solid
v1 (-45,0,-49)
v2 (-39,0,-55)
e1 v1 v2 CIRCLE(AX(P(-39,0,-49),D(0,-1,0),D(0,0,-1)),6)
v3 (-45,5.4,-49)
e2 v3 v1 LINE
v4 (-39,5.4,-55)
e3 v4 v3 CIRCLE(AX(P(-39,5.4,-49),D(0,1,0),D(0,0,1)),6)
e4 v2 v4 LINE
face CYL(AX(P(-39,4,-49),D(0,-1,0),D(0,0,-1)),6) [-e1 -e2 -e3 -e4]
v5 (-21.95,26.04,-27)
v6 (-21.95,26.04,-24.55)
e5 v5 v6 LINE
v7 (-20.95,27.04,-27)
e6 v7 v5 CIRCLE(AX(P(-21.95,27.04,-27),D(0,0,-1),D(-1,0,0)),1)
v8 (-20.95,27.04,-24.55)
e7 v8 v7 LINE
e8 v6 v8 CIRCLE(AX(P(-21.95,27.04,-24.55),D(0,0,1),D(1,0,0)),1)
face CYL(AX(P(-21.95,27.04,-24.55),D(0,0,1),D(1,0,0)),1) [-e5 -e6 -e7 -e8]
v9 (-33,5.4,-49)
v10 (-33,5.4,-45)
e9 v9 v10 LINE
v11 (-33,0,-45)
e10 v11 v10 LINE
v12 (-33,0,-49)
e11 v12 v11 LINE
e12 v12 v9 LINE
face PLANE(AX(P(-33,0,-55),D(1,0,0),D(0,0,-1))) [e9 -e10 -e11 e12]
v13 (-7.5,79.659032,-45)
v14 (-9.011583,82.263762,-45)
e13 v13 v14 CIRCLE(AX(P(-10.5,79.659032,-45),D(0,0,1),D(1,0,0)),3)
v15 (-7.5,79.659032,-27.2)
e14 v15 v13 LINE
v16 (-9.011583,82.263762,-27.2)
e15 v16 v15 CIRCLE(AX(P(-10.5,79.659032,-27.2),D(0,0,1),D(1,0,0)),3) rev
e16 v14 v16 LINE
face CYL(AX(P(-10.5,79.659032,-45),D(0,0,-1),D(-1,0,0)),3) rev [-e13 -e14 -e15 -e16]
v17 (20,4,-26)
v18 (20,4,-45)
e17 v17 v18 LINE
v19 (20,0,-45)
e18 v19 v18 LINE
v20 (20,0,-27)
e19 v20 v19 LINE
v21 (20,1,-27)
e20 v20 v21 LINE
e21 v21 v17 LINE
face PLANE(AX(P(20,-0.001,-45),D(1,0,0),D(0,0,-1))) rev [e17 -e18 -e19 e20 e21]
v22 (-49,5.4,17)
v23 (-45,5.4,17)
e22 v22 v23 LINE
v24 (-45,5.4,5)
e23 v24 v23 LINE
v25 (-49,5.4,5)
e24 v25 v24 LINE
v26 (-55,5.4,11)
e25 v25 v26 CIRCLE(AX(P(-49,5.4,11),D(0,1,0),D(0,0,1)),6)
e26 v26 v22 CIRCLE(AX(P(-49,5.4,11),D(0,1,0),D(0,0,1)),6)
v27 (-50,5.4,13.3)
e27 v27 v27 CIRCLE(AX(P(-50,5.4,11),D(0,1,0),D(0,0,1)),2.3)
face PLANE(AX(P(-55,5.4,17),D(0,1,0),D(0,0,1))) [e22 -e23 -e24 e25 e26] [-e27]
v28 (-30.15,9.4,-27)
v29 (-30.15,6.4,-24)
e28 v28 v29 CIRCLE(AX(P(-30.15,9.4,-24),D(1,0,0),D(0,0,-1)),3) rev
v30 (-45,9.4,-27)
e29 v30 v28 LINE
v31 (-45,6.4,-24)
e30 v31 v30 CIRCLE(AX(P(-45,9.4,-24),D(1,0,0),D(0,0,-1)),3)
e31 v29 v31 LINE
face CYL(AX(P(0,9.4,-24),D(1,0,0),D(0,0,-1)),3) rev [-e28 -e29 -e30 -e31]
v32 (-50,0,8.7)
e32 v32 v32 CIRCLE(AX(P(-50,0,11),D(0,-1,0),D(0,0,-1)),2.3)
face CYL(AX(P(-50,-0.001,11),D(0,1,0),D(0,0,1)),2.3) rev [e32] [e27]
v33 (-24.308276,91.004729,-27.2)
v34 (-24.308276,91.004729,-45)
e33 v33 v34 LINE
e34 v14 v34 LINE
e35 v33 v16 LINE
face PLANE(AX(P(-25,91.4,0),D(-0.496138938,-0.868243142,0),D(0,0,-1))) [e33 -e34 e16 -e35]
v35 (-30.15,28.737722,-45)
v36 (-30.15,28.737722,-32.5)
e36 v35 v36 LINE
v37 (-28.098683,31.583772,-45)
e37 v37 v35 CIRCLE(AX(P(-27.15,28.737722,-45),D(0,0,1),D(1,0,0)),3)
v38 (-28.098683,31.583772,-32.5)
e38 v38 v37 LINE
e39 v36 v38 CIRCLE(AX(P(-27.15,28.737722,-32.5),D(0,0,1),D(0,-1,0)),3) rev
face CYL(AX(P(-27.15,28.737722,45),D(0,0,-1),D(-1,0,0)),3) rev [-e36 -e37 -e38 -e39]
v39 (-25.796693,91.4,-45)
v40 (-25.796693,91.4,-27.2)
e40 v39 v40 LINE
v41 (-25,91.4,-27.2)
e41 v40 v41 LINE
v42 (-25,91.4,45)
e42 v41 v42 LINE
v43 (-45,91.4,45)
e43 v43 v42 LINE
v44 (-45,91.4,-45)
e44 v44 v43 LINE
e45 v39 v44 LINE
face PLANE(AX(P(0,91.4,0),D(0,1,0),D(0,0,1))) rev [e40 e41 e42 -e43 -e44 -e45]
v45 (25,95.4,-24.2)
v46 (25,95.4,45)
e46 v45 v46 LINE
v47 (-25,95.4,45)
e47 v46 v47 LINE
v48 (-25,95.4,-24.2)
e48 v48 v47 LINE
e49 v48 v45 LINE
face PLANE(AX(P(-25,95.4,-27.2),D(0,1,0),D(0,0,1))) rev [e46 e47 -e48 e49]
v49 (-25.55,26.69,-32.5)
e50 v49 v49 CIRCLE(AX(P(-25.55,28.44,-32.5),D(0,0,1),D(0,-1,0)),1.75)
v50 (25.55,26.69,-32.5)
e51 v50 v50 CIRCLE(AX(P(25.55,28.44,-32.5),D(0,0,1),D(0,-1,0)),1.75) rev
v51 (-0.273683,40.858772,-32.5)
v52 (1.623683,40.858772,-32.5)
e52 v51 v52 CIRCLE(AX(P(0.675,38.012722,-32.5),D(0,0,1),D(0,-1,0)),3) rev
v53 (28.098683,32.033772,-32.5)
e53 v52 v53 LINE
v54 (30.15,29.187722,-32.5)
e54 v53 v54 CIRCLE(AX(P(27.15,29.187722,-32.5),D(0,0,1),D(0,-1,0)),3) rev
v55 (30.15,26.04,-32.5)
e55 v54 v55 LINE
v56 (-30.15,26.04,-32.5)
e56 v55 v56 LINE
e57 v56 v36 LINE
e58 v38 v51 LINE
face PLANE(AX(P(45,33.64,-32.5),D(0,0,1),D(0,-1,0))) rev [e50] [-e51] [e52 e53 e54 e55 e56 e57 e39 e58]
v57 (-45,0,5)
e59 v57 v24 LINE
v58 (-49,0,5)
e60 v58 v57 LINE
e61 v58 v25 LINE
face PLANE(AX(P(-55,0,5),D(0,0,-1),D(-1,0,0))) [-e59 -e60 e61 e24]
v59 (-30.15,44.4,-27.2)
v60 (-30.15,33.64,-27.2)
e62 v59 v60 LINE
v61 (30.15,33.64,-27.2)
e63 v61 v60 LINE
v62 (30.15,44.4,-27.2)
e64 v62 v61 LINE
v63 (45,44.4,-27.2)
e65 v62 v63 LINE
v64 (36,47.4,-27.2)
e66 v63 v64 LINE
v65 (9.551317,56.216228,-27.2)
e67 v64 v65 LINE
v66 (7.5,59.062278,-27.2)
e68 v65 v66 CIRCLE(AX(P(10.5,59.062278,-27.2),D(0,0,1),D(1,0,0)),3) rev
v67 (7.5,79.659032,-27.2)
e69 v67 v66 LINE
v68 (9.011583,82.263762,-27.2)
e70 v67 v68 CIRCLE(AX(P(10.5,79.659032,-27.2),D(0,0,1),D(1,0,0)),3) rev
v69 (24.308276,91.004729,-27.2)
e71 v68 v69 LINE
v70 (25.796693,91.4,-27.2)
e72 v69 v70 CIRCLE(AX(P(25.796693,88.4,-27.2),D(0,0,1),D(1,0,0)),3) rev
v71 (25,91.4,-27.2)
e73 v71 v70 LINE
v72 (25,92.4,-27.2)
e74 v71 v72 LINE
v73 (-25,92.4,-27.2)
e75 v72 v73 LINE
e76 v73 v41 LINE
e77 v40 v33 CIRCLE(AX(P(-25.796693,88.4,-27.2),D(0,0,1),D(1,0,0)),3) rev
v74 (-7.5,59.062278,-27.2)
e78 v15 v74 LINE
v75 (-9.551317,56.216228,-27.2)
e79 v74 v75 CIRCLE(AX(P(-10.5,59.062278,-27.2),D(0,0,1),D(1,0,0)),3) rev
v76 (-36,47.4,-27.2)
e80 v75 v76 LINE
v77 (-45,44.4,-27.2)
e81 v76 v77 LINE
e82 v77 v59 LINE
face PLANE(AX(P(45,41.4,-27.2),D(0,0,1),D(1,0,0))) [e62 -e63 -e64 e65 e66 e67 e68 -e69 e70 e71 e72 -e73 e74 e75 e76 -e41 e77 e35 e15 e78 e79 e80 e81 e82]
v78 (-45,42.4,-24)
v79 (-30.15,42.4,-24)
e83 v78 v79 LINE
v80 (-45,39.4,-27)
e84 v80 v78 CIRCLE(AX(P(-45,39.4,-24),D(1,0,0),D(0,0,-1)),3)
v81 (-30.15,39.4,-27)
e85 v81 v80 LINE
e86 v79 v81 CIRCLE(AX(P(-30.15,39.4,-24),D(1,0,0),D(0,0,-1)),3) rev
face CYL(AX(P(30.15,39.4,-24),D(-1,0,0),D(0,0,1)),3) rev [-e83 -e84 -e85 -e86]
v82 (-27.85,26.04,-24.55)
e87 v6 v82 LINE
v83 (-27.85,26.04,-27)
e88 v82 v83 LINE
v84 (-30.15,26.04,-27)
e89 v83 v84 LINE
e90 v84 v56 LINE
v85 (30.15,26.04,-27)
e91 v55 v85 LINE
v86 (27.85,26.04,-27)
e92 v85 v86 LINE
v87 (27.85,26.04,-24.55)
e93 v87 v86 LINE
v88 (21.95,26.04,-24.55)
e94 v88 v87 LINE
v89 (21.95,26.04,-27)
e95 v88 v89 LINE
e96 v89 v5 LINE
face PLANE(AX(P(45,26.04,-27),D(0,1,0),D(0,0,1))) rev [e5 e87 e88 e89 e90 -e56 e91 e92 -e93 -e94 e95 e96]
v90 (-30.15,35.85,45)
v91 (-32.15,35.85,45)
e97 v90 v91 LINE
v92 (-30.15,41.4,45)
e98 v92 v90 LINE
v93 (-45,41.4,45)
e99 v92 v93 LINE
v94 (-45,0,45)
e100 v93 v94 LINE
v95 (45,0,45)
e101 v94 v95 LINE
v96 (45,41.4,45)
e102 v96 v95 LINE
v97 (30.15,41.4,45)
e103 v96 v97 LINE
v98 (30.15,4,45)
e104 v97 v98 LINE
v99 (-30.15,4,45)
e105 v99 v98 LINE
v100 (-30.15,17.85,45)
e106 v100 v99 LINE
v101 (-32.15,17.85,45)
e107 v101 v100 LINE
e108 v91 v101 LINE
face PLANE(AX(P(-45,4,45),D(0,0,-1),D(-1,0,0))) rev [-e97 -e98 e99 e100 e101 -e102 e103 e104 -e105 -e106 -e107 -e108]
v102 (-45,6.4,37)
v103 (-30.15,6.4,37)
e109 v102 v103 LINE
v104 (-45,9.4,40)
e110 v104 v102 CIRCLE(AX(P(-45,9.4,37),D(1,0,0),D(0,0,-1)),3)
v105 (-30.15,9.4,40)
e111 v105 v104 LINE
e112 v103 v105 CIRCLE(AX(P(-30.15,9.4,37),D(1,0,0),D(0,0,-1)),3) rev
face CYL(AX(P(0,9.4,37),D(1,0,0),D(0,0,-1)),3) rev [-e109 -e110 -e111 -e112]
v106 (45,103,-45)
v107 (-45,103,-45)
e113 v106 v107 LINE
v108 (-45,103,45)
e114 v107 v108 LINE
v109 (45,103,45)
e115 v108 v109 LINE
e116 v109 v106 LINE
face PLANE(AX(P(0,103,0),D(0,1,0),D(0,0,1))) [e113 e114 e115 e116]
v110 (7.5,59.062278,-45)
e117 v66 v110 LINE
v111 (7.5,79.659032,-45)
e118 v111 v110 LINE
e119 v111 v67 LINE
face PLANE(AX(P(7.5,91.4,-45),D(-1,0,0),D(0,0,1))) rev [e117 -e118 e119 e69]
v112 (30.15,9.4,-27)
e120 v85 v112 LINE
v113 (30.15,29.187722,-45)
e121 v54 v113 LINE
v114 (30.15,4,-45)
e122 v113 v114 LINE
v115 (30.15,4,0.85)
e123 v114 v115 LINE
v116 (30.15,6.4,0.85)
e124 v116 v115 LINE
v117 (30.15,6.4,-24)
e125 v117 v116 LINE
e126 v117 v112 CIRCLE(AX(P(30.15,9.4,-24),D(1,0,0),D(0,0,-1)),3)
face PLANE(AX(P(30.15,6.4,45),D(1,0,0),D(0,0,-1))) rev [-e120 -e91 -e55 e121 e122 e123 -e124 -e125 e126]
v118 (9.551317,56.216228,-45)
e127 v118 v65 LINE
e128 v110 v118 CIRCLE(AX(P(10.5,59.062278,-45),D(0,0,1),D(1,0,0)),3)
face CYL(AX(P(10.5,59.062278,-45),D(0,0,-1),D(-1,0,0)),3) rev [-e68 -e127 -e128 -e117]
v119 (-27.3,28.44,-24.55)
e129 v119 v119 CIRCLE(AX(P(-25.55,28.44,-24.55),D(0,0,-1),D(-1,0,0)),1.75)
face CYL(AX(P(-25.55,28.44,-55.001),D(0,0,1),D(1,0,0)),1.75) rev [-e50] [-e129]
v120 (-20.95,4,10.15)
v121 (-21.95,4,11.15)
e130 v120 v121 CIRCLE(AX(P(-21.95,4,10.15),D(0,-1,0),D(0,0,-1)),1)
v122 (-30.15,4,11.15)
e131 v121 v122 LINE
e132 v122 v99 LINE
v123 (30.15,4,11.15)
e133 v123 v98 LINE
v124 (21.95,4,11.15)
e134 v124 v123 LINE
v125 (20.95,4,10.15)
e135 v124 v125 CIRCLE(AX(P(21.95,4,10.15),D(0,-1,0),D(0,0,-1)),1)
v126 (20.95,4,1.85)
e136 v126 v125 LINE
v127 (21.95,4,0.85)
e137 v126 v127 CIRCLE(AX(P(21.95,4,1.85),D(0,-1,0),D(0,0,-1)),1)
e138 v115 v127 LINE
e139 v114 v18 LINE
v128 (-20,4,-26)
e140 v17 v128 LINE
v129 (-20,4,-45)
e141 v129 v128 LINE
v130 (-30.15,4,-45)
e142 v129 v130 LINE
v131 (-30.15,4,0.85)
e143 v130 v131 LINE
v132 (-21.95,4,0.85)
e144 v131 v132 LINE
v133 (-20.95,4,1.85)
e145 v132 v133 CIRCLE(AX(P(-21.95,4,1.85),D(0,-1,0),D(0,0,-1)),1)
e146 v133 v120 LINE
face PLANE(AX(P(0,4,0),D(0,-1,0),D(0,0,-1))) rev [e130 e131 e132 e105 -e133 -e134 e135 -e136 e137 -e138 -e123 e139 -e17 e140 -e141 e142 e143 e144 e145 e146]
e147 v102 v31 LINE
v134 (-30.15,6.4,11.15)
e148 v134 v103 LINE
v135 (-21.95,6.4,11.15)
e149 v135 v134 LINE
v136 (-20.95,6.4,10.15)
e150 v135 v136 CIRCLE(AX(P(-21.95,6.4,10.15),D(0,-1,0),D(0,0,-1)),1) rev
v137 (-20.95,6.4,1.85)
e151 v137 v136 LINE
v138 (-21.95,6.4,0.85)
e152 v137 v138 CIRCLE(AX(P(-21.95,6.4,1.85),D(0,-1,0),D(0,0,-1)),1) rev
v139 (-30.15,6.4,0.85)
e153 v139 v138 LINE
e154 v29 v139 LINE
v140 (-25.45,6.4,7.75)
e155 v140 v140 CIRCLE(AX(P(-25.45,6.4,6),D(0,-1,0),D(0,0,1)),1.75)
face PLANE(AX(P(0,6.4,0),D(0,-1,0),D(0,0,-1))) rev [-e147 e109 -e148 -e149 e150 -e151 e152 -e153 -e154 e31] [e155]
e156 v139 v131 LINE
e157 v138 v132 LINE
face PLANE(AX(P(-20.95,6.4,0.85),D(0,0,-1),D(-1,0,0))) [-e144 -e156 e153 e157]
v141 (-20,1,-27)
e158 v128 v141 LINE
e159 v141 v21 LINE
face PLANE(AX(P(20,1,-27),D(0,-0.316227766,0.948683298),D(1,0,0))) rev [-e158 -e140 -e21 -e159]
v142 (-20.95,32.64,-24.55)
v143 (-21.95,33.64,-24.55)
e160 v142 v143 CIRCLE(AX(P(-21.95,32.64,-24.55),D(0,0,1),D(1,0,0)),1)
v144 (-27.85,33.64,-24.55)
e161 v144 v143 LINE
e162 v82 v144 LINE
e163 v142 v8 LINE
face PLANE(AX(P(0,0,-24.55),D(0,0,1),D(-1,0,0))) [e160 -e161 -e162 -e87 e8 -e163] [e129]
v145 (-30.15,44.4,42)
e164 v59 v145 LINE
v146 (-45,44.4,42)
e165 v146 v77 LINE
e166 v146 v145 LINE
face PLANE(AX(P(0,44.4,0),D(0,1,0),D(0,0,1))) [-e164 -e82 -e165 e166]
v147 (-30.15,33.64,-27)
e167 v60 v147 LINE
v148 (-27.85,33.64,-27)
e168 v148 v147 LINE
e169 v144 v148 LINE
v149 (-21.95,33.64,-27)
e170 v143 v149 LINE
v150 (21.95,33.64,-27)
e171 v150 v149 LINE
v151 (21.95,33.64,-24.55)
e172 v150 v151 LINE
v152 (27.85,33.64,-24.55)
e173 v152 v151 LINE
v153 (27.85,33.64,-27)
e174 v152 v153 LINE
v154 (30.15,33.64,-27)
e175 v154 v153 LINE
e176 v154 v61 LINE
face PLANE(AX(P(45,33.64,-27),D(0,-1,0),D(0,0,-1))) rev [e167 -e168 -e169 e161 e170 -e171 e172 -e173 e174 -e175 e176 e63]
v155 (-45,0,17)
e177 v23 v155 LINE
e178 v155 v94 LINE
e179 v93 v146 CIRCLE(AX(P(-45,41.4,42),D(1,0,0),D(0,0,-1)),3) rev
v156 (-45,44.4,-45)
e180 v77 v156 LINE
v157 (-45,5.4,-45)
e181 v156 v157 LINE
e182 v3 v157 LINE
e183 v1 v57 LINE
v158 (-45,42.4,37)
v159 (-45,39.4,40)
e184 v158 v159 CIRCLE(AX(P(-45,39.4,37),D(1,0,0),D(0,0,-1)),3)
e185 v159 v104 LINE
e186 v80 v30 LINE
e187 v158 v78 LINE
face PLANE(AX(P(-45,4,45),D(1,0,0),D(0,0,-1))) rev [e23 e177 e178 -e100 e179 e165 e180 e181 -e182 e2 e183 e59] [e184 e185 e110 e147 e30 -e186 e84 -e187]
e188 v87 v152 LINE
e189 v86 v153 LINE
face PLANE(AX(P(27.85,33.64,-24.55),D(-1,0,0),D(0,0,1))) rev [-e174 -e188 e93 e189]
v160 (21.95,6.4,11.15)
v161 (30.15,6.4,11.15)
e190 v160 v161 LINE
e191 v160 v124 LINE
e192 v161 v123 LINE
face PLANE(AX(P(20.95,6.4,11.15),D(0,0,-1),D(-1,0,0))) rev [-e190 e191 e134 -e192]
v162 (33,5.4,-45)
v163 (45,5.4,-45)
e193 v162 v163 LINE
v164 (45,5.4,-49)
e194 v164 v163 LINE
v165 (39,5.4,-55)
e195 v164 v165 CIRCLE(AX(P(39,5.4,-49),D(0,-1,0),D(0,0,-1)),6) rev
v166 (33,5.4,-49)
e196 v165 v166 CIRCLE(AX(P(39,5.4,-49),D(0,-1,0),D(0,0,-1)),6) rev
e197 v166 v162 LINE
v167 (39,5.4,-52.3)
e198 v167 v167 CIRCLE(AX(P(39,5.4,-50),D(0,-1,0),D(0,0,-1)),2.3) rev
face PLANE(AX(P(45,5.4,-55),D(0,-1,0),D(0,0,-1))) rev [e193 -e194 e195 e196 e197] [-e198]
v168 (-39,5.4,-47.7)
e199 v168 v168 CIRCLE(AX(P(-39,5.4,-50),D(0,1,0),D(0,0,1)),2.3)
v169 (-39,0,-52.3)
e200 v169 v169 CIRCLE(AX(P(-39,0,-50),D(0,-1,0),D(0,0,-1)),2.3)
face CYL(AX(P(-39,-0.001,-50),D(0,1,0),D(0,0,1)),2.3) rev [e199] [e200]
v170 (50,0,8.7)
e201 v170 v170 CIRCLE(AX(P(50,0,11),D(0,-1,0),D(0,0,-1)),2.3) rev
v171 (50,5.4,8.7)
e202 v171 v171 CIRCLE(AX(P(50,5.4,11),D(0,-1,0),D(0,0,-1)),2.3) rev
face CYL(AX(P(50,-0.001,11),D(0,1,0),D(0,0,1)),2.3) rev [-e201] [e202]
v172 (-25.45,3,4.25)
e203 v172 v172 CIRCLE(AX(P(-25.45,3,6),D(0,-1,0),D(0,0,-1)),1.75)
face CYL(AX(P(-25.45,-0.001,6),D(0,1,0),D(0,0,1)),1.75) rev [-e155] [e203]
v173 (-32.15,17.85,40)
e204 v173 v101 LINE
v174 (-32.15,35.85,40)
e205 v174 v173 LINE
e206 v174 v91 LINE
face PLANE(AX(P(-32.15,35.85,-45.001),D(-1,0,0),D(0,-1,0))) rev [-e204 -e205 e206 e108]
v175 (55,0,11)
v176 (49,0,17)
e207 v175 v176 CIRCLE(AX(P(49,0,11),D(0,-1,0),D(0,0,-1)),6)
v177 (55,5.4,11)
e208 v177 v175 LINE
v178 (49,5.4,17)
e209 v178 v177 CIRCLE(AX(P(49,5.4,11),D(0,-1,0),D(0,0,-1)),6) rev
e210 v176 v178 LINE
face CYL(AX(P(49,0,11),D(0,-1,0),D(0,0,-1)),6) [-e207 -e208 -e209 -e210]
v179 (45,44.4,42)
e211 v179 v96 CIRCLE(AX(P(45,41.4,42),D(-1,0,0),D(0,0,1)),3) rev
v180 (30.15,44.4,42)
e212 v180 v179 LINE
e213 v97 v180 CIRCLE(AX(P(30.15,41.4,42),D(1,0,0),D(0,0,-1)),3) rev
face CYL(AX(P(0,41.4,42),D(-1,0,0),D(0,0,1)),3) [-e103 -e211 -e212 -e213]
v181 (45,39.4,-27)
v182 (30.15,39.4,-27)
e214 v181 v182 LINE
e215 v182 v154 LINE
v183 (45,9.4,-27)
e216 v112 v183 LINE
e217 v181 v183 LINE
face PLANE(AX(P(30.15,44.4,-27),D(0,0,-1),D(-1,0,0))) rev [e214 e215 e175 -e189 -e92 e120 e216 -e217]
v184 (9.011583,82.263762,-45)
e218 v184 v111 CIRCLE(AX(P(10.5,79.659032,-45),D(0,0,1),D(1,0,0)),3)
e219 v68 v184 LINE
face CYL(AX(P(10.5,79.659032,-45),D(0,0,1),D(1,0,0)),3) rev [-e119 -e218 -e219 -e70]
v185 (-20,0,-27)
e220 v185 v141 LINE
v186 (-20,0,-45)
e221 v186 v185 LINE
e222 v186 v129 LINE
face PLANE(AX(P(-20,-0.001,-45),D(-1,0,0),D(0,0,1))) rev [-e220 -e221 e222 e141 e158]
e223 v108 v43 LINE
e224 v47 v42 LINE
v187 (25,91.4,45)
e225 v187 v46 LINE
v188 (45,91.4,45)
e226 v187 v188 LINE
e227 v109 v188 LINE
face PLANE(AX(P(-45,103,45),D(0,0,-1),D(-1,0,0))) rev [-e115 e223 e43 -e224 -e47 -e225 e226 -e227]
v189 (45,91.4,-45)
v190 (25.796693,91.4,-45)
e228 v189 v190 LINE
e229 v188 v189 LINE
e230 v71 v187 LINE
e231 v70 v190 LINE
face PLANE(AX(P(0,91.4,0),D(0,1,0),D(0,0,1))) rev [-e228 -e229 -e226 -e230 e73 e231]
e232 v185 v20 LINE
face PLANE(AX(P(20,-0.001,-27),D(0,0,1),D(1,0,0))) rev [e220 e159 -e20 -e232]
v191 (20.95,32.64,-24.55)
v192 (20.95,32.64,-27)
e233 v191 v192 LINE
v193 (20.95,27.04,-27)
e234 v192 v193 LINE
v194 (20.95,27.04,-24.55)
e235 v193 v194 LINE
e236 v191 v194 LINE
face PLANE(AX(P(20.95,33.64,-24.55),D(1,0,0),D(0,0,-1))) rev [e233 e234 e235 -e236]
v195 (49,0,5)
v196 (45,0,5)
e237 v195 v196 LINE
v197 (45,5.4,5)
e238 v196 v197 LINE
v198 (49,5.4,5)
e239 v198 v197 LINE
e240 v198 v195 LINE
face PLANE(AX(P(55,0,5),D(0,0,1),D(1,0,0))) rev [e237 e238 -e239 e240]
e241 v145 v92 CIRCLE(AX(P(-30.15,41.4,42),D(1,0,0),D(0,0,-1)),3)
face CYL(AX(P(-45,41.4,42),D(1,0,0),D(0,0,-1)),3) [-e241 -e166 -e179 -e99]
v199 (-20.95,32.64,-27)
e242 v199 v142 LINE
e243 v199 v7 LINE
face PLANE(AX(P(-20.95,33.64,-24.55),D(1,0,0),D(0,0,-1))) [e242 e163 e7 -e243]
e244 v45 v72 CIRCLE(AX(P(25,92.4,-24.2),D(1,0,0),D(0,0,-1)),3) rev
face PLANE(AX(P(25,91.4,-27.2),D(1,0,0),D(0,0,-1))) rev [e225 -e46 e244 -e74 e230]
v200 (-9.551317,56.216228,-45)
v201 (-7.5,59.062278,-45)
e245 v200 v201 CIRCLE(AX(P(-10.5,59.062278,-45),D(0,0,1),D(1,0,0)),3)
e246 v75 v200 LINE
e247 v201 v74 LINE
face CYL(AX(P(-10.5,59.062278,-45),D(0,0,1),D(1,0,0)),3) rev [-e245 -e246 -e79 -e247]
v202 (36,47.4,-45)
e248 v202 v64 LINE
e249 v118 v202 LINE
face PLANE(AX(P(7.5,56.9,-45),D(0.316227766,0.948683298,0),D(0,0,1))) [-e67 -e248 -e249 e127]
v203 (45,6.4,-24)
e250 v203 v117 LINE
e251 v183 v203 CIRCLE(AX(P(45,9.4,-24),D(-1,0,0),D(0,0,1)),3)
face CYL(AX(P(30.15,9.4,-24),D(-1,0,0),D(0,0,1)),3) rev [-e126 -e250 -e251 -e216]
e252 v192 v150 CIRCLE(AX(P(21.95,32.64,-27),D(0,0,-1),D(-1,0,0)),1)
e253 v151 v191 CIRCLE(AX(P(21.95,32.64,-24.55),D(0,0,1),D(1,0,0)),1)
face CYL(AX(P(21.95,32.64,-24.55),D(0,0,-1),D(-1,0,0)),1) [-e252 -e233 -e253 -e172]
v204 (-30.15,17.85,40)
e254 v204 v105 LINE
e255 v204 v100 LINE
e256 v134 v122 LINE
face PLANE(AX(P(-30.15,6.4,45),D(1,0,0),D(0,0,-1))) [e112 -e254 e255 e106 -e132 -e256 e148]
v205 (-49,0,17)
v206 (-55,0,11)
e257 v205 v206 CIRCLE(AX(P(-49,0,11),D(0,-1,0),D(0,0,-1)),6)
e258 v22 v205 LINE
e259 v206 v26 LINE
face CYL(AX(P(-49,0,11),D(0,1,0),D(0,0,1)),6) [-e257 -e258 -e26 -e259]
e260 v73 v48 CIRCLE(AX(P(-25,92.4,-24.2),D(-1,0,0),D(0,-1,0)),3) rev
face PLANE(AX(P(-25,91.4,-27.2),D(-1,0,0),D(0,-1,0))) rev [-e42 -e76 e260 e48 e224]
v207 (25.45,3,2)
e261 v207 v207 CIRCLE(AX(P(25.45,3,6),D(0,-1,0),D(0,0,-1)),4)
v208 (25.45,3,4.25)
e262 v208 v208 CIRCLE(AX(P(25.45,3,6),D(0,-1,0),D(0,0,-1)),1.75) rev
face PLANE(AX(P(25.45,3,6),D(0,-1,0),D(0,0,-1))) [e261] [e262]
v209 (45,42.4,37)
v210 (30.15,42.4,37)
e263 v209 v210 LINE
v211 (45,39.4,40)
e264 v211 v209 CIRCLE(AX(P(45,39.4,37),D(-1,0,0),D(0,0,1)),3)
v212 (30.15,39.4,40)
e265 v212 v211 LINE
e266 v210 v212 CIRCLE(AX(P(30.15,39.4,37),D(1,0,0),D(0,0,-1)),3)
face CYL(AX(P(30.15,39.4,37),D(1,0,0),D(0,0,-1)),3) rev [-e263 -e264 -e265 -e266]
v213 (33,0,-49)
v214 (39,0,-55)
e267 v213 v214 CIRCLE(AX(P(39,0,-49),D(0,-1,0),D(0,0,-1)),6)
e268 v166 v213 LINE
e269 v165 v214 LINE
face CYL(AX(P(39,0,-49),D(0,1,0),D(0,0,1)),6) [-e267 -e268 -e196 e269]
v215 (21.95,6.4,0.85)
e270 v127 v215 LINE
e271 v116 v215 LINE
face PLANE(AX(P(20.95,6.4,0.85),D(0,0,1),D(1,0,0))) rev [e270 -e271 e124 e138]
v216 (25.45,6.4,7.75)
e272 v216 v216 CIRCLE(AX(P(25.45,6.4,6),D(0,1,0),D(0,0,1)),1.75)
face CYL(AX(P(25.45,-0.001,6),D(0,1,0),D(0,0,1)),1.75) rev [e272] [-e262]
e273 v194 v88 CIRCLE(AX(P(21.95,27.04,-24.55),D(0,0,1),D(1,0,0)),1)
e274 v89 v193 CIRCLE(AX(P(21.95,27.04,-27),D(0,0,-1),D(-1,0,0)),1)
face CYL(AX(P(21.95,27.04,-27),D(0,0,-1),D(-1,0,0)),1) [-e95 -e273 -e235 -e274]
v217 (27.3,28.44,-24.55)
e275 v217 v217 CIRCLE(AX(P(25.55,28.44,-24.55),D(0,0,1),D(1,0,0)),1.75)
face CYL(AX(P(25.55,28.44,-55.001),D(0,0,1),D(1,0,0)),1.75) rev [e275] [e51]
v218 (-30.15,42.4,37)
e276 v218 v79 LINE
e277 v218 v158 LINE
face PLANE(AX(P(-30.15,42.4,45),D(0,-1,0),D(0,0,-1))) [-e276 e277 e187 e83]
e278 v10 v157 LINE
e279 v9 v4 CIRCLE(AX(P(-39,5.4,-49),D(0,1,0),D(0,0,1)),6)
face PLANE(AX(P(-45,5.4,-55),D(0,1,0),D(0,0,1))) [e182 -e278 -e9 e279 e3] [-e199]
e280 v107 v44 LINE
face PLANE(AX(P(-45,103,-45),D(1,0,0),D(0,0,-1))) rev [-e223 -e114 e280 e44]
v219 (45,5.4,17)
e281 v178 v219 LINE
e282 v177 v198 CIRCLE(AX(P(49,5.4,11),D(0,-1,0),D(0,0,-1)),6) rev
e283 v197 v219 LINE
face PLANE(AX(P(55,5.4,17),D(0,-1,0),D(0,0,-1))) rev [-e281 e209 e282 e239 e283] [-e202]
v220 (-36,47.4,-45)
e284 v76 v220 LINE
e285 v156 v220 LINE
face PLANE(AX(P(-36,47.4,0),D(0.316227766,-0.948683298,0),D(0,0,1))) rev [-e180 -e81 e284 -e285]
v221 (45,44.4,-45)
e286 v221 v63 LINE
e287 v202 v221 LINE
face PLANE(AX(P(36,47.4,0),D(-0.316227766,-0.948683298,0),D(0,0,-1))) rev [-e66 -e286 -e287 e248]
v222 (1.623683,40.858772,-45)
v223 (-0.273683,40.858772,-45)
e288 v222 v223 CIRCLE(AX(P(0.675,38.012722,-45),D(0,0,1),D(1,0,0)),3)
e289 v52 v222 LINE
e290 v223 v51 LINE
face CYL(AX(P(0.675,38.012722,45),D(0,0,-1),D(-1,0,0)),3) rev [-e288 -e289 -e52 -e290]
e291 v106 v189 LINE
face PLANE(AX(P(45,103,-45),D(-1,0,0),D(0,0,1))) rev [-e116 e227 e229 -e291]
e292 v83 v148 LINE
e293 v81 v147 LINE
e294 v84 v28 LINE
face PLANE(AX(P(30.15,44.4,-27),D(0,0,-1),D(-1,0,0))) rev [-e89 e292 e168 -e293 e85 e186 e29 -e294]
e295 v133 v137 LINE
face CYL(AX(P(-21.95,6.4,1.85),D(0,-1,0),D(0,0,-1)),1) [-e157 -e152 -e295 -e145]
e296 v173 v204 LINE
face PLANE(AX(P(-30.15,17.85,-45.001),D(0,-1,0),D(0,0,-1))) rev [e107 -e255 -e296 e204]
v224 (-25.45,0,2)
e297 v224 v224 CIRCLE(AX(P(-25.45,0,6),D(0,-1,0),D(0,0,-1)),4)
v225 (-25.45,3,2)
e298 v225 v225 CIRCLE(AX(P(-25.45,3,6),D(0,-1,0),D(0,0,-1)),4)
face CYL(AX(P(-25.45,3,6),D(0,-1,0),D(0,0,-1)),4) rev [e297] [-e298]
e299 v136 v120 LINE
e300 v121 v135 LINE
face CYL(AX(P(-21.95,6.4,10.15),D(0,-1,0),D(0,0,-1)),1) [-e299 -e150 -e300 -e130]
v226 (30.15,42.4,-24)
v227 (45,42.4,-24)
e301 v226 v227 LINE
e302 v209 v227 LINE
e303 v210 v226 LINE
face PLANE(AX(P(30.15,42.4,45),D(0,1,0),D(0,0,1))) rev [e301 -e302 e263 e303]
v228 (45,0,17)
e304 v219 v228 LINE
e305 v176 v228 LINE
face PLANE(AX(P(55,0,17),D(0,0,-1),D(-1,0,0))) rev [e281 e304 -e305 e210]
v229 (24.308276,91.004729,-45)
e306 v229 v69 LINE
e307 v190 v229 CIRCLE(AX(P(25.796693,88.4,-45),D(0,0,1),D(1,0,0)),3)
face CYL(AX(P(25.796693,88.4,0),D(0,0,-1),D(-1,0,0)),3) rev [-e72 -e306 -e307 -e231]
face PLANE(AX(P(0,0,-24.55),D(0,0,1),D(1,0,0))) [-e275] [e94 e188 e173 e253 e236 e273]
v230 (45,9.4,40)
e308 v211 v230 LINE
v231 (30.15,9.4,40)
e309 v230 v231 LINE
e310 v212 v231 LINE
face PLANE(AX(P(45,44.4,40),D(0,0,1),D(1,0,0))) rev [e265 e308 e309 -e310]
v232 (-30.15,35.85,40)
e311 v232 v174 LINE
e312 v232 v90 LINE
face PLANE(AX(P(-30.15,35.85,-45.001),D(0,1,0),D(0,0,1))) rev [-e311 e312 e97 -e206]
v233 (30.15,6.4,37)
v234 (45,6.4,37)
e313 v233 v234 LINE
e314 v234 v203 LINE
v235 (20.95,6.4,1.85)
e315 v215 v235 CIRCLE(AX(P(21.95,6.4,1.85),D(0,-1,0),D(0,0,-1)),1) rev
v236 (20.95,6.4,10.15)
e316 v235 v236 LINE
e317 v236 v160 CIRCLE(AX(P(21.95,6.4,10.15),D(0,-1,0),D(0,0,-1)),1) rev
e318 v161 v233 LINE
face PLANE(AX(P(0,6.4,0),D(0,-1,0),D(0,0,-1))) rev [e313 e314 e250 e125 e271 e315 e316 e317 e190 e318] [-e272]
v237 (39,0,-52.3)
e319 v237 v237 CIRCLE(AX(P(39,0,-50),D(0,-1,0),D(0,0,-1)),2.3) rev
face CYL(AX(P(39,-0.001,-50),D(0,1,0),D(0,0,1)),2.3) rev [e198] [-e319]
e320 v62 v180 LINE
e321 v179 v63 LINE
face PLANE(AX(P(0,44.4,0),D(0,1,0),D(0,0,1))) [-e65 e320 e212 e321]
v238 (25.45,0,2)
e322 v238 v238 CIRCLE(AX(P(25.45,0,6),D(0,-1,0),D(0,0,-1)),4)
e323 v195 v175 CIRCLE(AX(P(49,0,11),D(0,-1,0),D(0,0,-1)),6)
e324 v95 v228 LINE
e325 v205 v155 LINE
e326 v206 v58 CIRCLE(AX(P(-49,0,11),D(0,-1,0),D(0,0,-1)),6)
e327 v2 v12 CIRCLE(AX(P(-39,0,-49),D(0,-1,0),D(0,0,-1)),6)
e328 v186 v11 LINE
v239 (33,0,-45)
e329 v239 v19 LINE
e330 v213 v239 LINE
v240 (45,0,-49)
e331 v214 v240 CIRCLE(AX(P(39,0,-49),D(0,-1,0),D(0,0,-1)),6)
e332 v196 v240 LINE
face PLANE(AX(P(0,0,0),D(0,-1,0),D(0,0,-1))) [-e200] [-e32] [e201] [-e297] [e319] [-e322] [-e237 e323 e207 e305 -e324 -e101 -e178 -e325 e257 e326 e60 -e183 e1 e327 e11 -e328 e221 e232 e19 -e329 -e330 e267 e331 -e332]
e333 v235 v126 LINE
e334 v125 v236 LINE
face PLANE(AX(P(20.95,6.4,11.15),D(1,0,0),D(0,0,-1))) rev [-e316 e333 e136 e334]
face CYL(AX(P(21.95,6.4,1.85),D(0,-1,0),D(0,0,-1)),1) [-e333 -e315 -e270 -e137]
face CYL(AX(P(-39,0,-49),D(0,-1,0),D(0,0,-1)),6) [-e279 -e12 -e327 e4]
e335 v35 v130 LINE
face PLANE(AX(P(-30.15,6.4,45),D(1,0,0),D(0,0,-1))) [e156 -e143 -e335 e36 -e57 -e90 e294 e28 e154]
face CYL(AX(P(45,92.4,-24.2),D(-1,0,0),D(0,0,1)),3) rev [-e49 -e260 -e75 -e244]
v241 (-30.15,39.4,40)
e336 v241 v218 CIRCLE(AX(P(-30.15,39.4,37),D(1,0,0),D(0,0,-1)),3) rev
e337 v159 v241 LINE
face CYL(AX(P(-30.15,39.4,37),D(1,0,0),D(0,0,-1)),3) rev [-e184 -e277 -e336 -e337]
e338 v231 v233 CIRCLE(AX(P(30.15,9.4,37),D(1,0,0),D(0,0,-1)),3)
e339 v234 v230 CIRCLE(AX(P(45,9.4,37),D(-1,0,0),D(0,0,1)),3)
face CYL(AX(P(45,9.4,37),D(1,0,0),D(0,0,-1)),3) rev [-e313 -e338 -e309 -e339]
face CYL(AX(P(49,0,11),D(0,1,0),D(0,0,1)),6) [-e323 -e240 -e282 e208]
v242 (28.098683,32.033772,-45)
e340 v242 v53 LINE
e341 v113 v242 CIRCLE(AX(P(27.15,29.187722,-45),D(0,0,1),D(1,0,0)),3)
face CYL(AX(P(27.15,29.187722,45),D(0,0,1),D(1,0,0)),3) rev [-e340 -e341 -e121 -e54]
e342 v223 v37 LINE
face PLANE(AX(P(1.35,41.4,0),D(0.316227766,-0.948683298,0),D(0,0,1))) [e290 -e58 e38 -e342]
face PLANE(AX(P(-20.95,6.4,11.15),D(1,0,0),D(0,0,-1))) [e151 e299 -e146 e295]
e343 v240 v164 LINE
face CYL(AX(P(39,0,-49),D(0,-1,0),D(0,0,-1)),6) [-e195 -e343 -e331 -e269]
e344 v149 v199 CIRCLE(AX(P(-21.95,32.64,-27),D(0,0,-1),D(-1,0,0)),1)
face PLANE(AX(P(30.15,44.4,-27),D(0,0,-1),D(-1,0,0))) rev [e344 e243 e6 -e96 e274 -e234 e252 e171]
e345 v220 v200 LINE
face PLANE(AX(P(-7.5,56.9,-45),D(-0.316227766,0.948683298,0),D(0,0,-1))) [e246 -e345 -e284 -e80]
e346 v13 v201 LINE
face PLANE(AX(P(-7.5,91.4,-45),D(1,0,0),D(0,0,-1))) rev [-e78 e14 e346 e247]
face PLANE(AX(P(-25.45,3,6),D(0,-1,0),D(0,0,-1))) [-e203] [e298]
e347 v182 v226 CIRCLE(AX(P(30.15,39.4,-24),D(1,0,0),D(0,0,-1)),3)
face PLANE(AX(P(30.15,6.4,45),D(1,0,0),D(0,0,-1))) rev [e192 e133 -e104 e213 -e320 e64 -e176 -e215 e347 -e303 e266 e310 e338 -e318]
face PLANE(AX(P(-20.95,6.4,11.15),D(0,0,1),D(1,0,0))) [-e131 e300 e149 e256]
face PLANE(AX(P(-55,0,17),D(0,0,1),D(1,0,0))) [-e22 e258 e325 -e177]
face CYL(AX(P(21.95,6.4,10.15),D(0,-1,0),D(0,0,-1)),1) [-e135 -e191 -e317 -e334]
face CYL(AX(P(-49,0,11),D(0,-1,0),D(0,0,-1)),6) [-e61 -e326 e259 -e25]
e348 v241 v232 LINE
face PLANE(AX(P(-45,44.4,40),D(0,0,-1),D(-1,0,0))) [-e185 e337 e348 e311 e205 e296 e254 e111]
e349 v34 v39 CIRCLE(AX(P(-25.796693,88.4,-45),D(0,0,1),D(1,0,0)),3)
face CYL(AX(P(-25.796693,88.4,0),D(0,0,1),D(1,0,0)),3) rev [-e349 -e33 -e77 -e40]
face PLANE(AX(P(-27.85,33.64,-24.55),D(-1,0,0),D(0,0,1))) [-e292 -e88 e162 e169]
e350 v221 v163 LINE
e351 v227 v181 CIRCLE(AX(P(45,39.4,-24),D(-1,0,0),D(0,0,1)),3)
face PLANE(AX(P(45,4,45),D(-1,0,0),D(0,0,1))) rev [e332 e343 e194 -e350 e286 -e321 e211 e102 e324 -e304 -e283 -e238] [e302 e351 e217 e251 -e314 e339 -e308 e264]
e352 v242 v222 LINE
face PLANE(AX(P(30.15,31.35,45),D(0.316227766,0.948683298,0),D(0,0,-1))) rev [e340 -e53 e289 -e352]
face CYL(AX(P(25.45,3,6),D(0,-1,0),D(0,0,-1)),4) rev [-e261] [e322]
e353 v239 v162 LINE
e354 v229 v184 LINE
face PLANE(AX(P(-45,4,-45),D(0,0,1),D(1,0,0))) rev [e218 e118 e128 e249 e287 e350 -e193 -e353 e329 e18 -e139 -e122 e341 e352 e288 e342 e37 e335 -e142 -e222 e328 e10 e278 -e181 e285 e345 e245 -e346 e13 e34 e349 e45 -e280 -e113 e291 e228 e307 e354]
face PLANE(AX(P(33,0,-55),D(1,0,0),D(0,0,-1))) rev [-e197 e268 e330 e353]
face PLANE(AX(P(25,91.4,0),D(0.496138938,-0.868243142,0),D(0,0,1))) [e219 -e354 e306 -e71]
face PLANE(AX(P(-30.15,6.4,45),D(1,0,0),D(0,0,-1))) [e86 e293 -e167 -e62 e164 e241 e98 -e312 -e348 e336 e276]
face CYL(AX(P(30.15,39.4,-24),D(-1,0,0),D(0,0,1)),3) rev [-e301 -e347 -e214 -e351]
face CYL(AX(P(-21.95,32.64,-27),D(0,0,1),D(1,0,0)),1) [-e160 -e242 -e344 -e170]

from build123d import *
from OCP.BRepFilletAPI import BRepFilletAPI_MakeChamfer

# Parameters (mm, degrees)
ESQUISSE2_W             = 90
ESQUISSE2_H             = 90
BOSS_EXTRU_1_DEPTH      = 4
ESQUISSE3_W             = 9.2
ESQUISSE3_H             = 10.3
BOSS_EXTRU_2_DEPTH      = 2.4
CONG_1_R                = 1
ESQUISSE5_W             = 14.85
ESQUISSE5_H             = 90
BOSS_EXTRU_3_DEPTH      = 2.4
ESQUISSE6_W             = 14.85
ESQUISSE6_H             = 5
BOSS_EXTRU_4_DEPTH      = 38
ESQUISSE8_W             = 14.85
ESQUISSE8_H             = 18
BOSS_EXTRU_5_DEPTH      = 38
BOSS_EXTRU_6_REACH      = 97.814
ESQUISSE9_W             = 14.85
ESQUISSE9_H             = 2
CONG_1_OF_SYM_TRIE1_R   = 1
ENL_V_MAT_EXTRU_1_REACH = 111.983
ESQUISSE10_W            = 2
ESQUISSE10_H            = 18
ENL_V_MAT_EXTRU_2_REACH = 77.38
ESQUISSE11_W            = 40
ESQUISSE11_H            = 18
BOSS_EXTRU_7_REACH      = 100.203
ESQUISSE12_W            = 5.5
ESQUISSE12_H            = 7.6
ESQUISSE13_W            = 6.9
ESQUISSE13_H            = 7.6
BOSS_EXTRU_8_DEPTH      = 2.45
CONG_2_R                = 1
CONG_2_OF_SYM_TRIE2_R   = 1
BOSS_EXTRU_9_DEPTH      = 3
BOSS_EXTRU_9_DEPTH_BACK = 3
ESQUISSE14_W            = 90
ESQUISSE14_H            = 17.8
ESQUISSE15_W            = 15
ESQUISSE15_H            = 17.8
BOSS_EXTRU_10_DEPTH     = 44
ESQUISSE16_W            = 90
ESQUISSE16_H            = 90
BOSS_EXTRU_11_DEPTH     = 11.6
ESQUISSE20_W            = 12
ESQUISSE20_H            = 5.4
BOSS_EXTRU_13_DEPTH     = 10
ESQUISSE21_W            = 12
ESQUISSE21_H            = 5.4
BOSS_EXTRU_14_DEPTH     = 10
CONG_3_R                = 6
ENL_V_MAT_EXTRU_4_REACH = 126.022
ESQUISSE23_R            = 2.3
CONG_3_OF_SYM_TRIE3_R   = 6
ENL_V_MAT_EXTRU_5_REACH = 126.022
ESQUISSE24_R            = 1.75
ENL_V_MAT_EXTRU_6_REACH = 137.909
ESQUISSE26_R            = 1.75
ESQUISSE27_W            = 50
ESQUISSE27_H            = 4
ENL_V_MAT_EXTRU_7_DEPTH = 72.2
CHANFREIN3_SIZE         = 28.5
CHANFREIN3_SIZE2        = 9.5
CHANFREIN4_SIZE         = 10
CHANFREIN4_SIZE2        = 17.5
CHANFREIN8_START        = -45
CHANFREIN8_DEPTH        = 17.8
CHANFREIN9_SIZE         = 3
CHANFREIN9_SIZE_2       = 9
CHANFREIN10_START       = 25.930676813
CHANFREIN10_OUTLINE_W   = 40
CHANFREIN10_OUTLINE_H   = 3.16227766
CHANFREIN10_DEPTH       = 2.069323187
CONG_9_R                = 3
CHANFREIN13_START       = -45
CHANFREIN13_DEPTH       = 17.8
CONG_10_R               = 3
ESQUISSE37_R            = 4
ENL_V_MAT_EXTRU_8_DEPTH = 3
BOSS_EXTRU_15_DEPTH     = 5.3
CONG_11_R               = 3


with BuildPart() as part:
    # Esquisse2 → Boss.-Extru.1 (new body)
    with BuildSketch(Plane(origin=(0, 0, 0), x_dir=(1, 0, 0), z_dir=(0, 1, 0))):
        Rectangle(ESQUISSE2_W, ESQUISSE2_H)
    extrude(amount=BOSS_EXTRU_1_DEPTH)

    # Esquisse3 → Boss.-Extru.2 (add)
    with BuildSketch(Plane(origin=(0, 4, 0), x_dir=(1, 0, 0), z_dir=(0, 1, 0))):
        with Locations((25.55, -6)):
            Rectangle(ESQUISSE3_W, ESQUISSE3_H)
    boss_extru_2 = extrude(amount=BOSS_EXTRU_2_DEPTH)

    # Congé1
    cong_1_edges = [part.edges().sort_by_distance(p)[0] for p in [
        (20.95, 5.2, 0.85),
        (20.95, 5.2, 11.15),
    ]]
    fillet(cong_1_edges, radius=CONG_1_R)

    # Esquisse5 → Boss.-Extru.3 (add)
    with BuildSketch(Plane(origin=(0, 4, 0), x_dir=(1, 0, 0), z_dir=(0, 1, 0))):
        with Locations((37.575, 0)):
            Rectangle(ESQUISSE5_W, ESQUISSE5_H)
    boss_extru_3 = extrude(amount=BOSS_EXTRU_3_DEPTH)

    # Esquisse6 → Boss.-Extru.4 (add)
    with BuildSketch(Plane(origin=(0, 6.4, 0), x_dir=(1, 0, 0), z_dir=(0, 1, 0))):
        with Locations((37.575, -42.5)):
            Rectangle(ESQUISSE6_W, ESQUISSE6_H)
    boss_extru_4 = extrude(amount=BOSS_EXTRU_4_DEPTH)

    # Esquisse8 → Boss.-Extru.5 (add)
    with BuildSketch(Plane(origin=(0, 6.4, 0), x_dir=(1, 0, 0), z_dir=(0, 1, 0))):
        with Locations((37.575, 36)):
            Rectangle(ESQUISSE8_W, ESQUISSE8_H)
    boss_extru_5 = extrude(amount=BOSS_EXTRU_5_DEPTH)

    # Esquisse9 → Boss.-Extru.6 (add, up to next)
    with BuildSketch(Plane.XY.offset(-27), mode=Mode.PRIVATE) as boss_extru_6_sk1:
        with Locations((37.575, 43.4)):
            Rectangle(ESQUISSE9_W, ESQUISSE9_H)
    boss_extru_6_tool1 = extrude(boss_extru_6_sk1.sketch, amount=BOSS_EXTRU_6_REACH, mode=Mode.PRIVATE) - part.part
    boss_extru_6 = boss_extru_6_tool1.solids().sort_by_distance((37.575, 43.4, -27))[0]
    add(boss_extru_6)

    # Symétrie1: Boss.-Extru.2, Boss.-Extru.3, Boss.-Extru.4, Boss.-Extru.5, Boss.-Extru.6 across plane
    add(boss_extru_2.mirror(Plane(origin=(0, 0, 0), x_dir=(0, 0, 1), z_dir=(1, 0, 0))))
    add(boss_extru_3.mirror(Plane(origin=(0, 0, 0), x_dir=(0, 0, 1), z_dir=(1, 0, 0))))
    add(boss_extru_4.mirror(Plane(origin=(0, 0, 0), x_dir=(0, 0, 1), z_dir=(1, 0, 0))))
    add(boss_extru_5.mirror(Plane(origin=(0, 0, 0), x_dir=(0, 0, 1), z_dir=(1, 0, 0))))
    add(boss_extru_6.mirror(Plane(origin=(0, 0, 0), x_dir=(0, 0, 1), z_dir=(1, 0, 0))))

    # Congé1 of Symétrie1
    cong_1_of_sym_trie1_edges = [part.edges().sort_by_distance(p)[0] for p in [
        (-20.95, 5.2, 0.85),
        (-20.95, 5.2, 11.15),
    ]]
    fillet(cong_1_of_sym_trie1_edges, radius=CONG_1_OF_SYM_TRIE1_R)

    # Esquisse10 → Enlèv. mat.-Extru.1 (cut, up to next)
    with BuildSketch(Plane.XY.offset(45), mode=Mode.PRIVATE) as enl_v_mat_extru_1_sk1:
        with Locations((-31.15, 26.85)):
            Rectangle(ESQUISSE10_W, ESQUISSE10_H)
    enl_v_mat_extru_1_tool1 = extrude(enl_v_mat_extru_1_sk1.sketch, amount=-ENL_V_MAT_EXTRU_1_REACH, mode=Mode.PRIVATE) & part.part
    add(enl_v_mat_extru_1_tool1.solids().sort_by_distance((-31.15, 26.85, 45))[0], mode=Mode.SUBTRACT)

    # Esquisse11 → Enlèv. mat.-Extru.2 (cut, up to next)
    with BuildSketch(Plane(origin=(0, 4, 0), x_dir=(1, 0, 0), z_dir=(0, 1, 0)), mode=Mode.PRIVATE) as enl_v_mat_extru_2_sk1:
        with Locations((0, 36)):
            Rectangle(ESQUISSE11_W, ESQUISSE11_H)
    enl_v_mat_extru_2_tool1 = extrude(enl_v_mat_extru_2_sk1.sketch, amount=-ENL_V_MAT_EXTRU_2_REACH, mode=Mode.PRIVATE) & part.part
    add(enl_v_mat_extru_2_tool1.solids().sort_by_distance((0, 4, -36))[0], mode=Mode.SUBTRACT)

    # Esquisse12 → Boss.-Extru.7 (add, up to next)
    with BuildSketch(Plane(origin=(-30.15, 0, 0), x_dir=(0, 0, -1), z_dir=(1, 0, 0)), mode=Mode.PRIVATE) as boss_extru_7_sk1:
        with Locations((29.75, 29.84)):
            Rectangle(ESQUISSE12_W, ESQUISSE12_H)
    boss_extru_7_tool1 = extrude(boss_extru_7_sk1.sketch, amount=BOSS_EXTRU_7_REACH, mode=Mode.PRIVATE) - part.part
    add(boss_extru_7_tool1.solids().sort_by_distance((-30.15, 29.84, -29.75))[0])

    # Esquisse13 → Boss.-Extru.8 (add)
    with BuildSketch(Plane.XY.offset(-27)):
        with Locations((24.4, 29.84)):
            Rectangle(ESQUISSE13_W, ESQUISSE13_H)
    boss_extru_8 = extrude(amount=BOSS_EXTRU_8_DEPTH)

    # Congé2
    cong_2_edges = [part.edges().sort_by_distance(p)[0] for p in [
        (20.95, 33.64, -25.775),
        (20.95, 26.04, -25.775),
    ]]
    fillet(cong_2_edges, radius=CONG_2_R)

    # Symétrie2: Boss.-Extru.8 across plane
    add(boss_extru_8.mirror(Plane(origin=(0, 0, 0), x_dir=(0, 0, 1), z_dir=(1, 0, 0))))

    # Congé2 of Symétrie2
    cong_2_of_sym_trie2_edges = [part.edges().sort_by_distance(p)[0] for p in [
        (-20.95, 33.64, -25.775),
        (-20.95, 26.04, -25.775),
    ]]
    fillet(cong_2_of_sym_trie2_edges, radius=CONG_2_OF_SYM_TRIE2_R)

    # Esquisse14 → Boss.-Extru.9 (add, two sides: drawn at the far end of the back side and taken through both)
    with BuildSketch(Plane(origin=(0, 44.4, 0), x_dir=(1, 0, 0), z_dir=(0, 1, 0)).offset(-BOSS_EXTRU_9_DEPTH_BACK)):
        with Locations((0, 36.1)):
            Rectangle(ESQUISSE14_W, ESQUISSE14_H)
    extrude(amount=BOSS_EXTRU_9_DEPTH + BOSS_EXTRU_9_DEPTH_BACK)

    # Esquisse15 → Boss.-Extru.10 (add)
    with BuildSketch(Plane(origin=(0, 47.4, 0), x_dir=(1, 0, 0), z_dir=(0, 1, 0))):
        with Locations((0, 36.1)):
            Rectangle(ESQUISSE15_W, ESQUISSE15_H)
    extrude(amount=BOSS_EXTRU_10_DEPTH)

    # Esquisse16 → Boss.-Extru.11 (add)
    with BuildSketch(Plane(origin=(0, 91.4, 0), x_dir=(1, 0, 0), z_dir=(0, 1, 0))):
        Rectangle(ESQUISSE16_W, ESQUISSE16_H)
    extrude(amount=BOSS_EXTRU_11_DEPTH)

    # Esquisse20 → Boss.-Extru.13 (add)
    with BuildSketch(Plane(origin=(45, 0, 0), x_dir=(0, 0, -1), z_dir=(1, 0, 0))):
        with Locations((-11, 2.7)):
            Rectangle(ESQUISSE20_W, ESQUISSE20_H)
    boss_extru_13 = extrude(amount=BOSS_EXTRU_13_DEPTH)

    # Esquisse21 → Boss.-Extru.14 (add)
    with BuildSketch(Plane(origin=(0, 0, -45), x_dir=(-1, 0, 0), z_dir=(0, 0, -1))):
        with Locations((-39, 2.7)):
            Rectangle(ESQUISSE21_W, ESQUISSE21_H)
    boss_extru_14 = extrude(amount=BOSS_EXTRU_14_DEPTH)

    # Congé3
    cong_3_edges = [part.edges().sort_by_distance(p)[0] for p in [
        (33, 2.7, -55),
        (45, 2.7, -55),
        (55, 2.7, 5),
        (55, 2.7, 17),
    ]]
    fillet(cong_3_edges, radius=CONG_3_R - 0.0001)  # a hair under: the kernel refuses the full size

    # Esquisse23 → Enlèv. mat.-Extru.4 (cut, up to next)
    with BuildSketch(Plane(origin=(0, 6.4, 0), x_dir=(1, 0, 0), z_dir=(0, 1, 0)), mode=Mode.PRIVATE) as enl_v_mat_extru_4_sk1:
        with Locations(Location((50, -11, 0), (0, 0, 90))):
            Circle(ESQUISSE23_R)
    enl_v_mat_extru_4_tool1 = extrude(enl_v_mat_extru_4_sk1.sketch, amount=-ENL_V_MAT_EXTRU_4_REACH, mode=Mode.PRIVATE) & part.part
    # Esquisse23 → Enlèv. mat.-Extru.4 (cut, up to next)
    with BuildSketch(Plane(origin=(0, 6.4, 0), x_dir=(1, 0, 0), z_dir=(0, 1, 0)), mode=Mode.PRIVATE) as enl_v_mat_extru_4_sk2:
        with Locations(Location((39, 50, 0), (0, 0, 90))):
            Circle(ESQUISSE23_R)
    enl_v_mat_extru_4_tool2 = extrude(enl_v_mat_extru_4_sk2.sketch, amount=-ENL_V_MAT_EXTRU_4_REACH, mode=Mode.PRIVATE) & part.part
    enl_v_mat_extru_4_1 = enl_v_mat_extru_4_tool1.solids().sort_by_distance((50, 6.4, 11))[0]
    add(enl_v_mat_extru_4_1, mode=Mode.SUBTRACT)
    enl_v_mat_extru_4_2 = enl_v_mat_extru_4_tool2.solids().sort_by_distance((39, 6.4, -50))[0]
    add(enl_v_mat_extru_4_2, mode=Mode.SUBTRACT)
    enl_v_mat_extru_4 = enl_v_mat_extru_4_1 + enl_v_mat_extru_4_2  # Enlèv. mat.-Extru.4 as one shape, for the pattern or mirror that repeats it

    # Symétrie3: Boss.-Extru.13, Boss.-Extru.14, Enlèv. mat.-Extru.4 across plane
    add(boss_extru_13.mirror(Plane(origin=(0, 0, 0), x_dir=(0, 0, 1), z_dir=(1, 0, 0))))
    add(boss_extru_14.mirror(Plane(origin=(0, 0, 0), x_dir=(0, 0, 1), z_dir=(1, 0, 0))))
    add(enl_v_mat_extru_4.mirror(Plane(origin=(0, 0, 0), x_dir=(0, 0, 1), z_dir=(1, 0, 0))), mode=Mode.SUBTRACT)

    # Congé3 of Symétrie3
    cong_3_of_sym_trie3_edges = [part.edges().sort_by_distance(p)[0] for p in [
        (-33, 2.7, -55),
        (-45, 2.7, -55),
        (-55, 2.7, 5),
        (-55, 2.7, 17),
    ]]
    fillet(cong_3_of_sym_trie3_edges, radius=CONG_3_OF_SYM_TRIE3_R - 0.0001)  # a hair under: the kernel refuses the full size

    # Esquisse24 → Enlèv. mat.-Extru.5 (cut, up to next)
    with BuildSketch(Plane(origin=(0, 6.4, 0), x_dir=(1, 0, 0), z_dir=(0, 1, 0)), mode=Mode.PRIVATE) as enl_v_mat_extru_5_sk1:
        with Locations(Location((25.45, -6, 0), (0, 0, 270))):
            Circle(ESQUISSE24_R)
    enl_v_mat_extru_5_tool1 = extrude(enl_v_mat_extru_5_sk1.sketch, amount=-ENL_V_MAT_EXTRU_5_REACH, mode=Mode.PRIVATE) & part.part
    enl_v_mat_extru_5 = enl_v_mat_extru_5_tool1.solids().sort_by_distance((25.45, 6.4, 6))[0]
    add(enl_v_mat_extru_5, mode=Mode.SUBTRACT)

    # Esquisse26 → Enlèv. mat.-Extru.6 (cut, up to next)
    with BuildSketch(Plane.XY.offset(-24.55), mode=Mode.PRIVATE) as enl_v_mat_extru_6_sk1:
        with Locations((25.55, 28.44)):
            Circle(ESQUISSE26_R)
    enl_v_mat_extru_6_tool1 = extrude(enl_v_mat_extru_6_sk1.sketch, amount=-ENL_V_MAT_EXTRU_6_REACH, mode=Mode.PRIVATE) & part.part
    enl_v_mat_extru_6 = enl_v_mat_extru_6_tool1.solids().sort_by_distance((25.55, 28.44, -24.55))[0]
    add(enl_v_mat_extru_6, mode=Mode.SUBTRACT)

    # Symétrie5: Enlèv. mat.-Extru.5, Enlèv. mat.-Extru.6 across plane
    add(enl_v_mat_extru_5.mirror(Plane(origin=(0, 0, 0), x_dir=(0, 0, 1), z_dir=(1, 0, 0))), mode=Mode.SUBTRACT)
    add(enl_v_mat_extru_6.mirror(Plane(origin=(0, 0, 0), x_dir=(0, 0, 1), z_dir=(1, 0, 0))), mode=Mode.SUBTRACT)

    # Esquisse27 → Enlèv. mat.-Extru.7 (cut)
    with BuildSketch(Plane.XY.offset(45)):
        with Locations((0, 93.4)):
            Rectangle(ESQUISSE27_W, ESQUISSE27_H)
    extrude(amount=-ENL_V_MAT_EXTRU_7_DEPTH, mode=Mode.SUBTRACT)

    # Chanfrein3: one chamfer whose edges measure the first distance from different faces: ONE call of the kernel's chamfer builder (chamfer() names one face for all edges)
    chanfrein3_edges_1 = [part.edges().sort_by_distance(p)[0] for p in [
        (-7.5, 47.4, -36.1),
    ]]
    chanfrein3_side_1 = [part.faces().sort_by_distance(p)[0] for p in [
        (-26.25, 47.4, -36.1),
    ]]
    chanfrein3_edges_2 = [part.edges().sort_by_distance(p)[0] for p in [
        (7.5, 47.4, -36.1),
    ]]
    chanfrein3_side_2 = [part.faces().sort_by_distance(p)[0] for p in [
        (26.25, 47.4, -36.1),
    ]]
    chanfrein3 = BRepFilletAPI_MakeChamfer(part.part.solid().wrapped)
    for e in chanfrein3_edges_1:
        chanfrein3.Add(CHANFREIN3_SIZE, CHANFREIN3_SIZE2, e.wrapped, chanfrein3_side_1[0].wrapped)  # the first distance lies on this face
    for e in chanfrein3_edges_2:
        chanfrein3.Add(CHANFREIN3_SIZE, CHANFREIN3_SIZE2, e.wrapped, chanfrein3_side_2[0].wrapped)  # the first distance lies on this face
    add(Compound.cast(chanfrein3.Shape()), mode=Mode.REPLACE)

    # Chanfrein4: one chamfer whose edges measure the first distance from different faces: ONE call of the kernel's chamfer builder (chamfer() names one face for all edges)
    chanfrein4_edges_1 = [part.edges().sort_by_distance(p)[0] for p in [
        (7.5, 91.4, -36.1),
    ]]
    chanfrein4_side_1 = [part.faces().sort_by_distance(p)[0] for p in [
        (7.5, 74.15, -36.1),
    ]]
    chanfrein4_edges_2 = [part.edges().sort_by_distance(p)[0] for p in [
        (-7.5, 91.4, -36.1),
    ]]
    chanfrein4_side_2 = [part.faces().sort_by_distance(p)[0] for p in [
        (-7.5, 74.15, -36.1),
    ]]
    chanfrein4 = BRepFilletAPI_MakeChamfer(part.part.solid().wrapped)
    for e in chanfrein4_edges_1:
        chanfrein4.Add(CHANFREIN4_SIZE, CHANFREIN4_SIZE2, e.wrapped, chanfrein4_side_1[0].wrapped)  # the first distance lies on this face
    for e in chanfrein4_edges_2:
        chanfrein4.Add(CHANFREIN4_SIZE, CHANFREIN4_SIZE2, e.wrapped, chanfrein4_side_2[0].wrapped)  # the first distance lies on this face
    add(Compound.cast(chanfrein4.Shape()), mode=Mode.REPLACE)

    # Chanfrein8: read off the stored shape, not the designer's step
    # Chanfrein8 outline → Chanfrein8 (add)
    with BuildSketch(Plane.XY.offset(CHANFREIN8_START)):
        Polygon((30.15, 31.35), (30.15, 41.4), (0, 41.4), align=None)
    extrude(amount=CHANFREIN8_DEPTH)

    # Chanfrein9
    chanfrein9_edges_1 = [part.edges().sort_by_distance(p)[0] for p in [
        (45, 47.4, -36.1),
    ]]
    chanfrein9_side_1 = [part.faces().sort_by_distance(p)[0] for p in [
        (45, 47.34, -36.1),
    ]]
    chanfrein9_edges_2 = [part.edges().sort_by_distance(p)[0] for p in [
        (-45, 47.4, -36.1),
    ]]
    chanfrein9_side_2 = [part.faces().sort_by_distance(p)[0] for p in [
        (-44.94, 47.4, -36.1),
    ]]
    chanfrein9 = BRepFilletAPI_MakeChamfer(part.part.solid().wrapped)
    for e in chanfrein9_edges_1:
        chanfrein9.Add(CHANFREIN9_SIZE - 0.0001, CHANFREIN9_SIZE_2 - 0.0001, e.wrapped, chanfrein9_side_1[0].wrapped)
    for e in chanfrein9_edges_2:
        chanfrein9.Add(CHANFREIN9_SIZE_2 - 0.0001, CHANFREIN9_SIZE - 0.0001, e.wrapped, chanfrein9_side_2[0].wrapped)
    add(Compound.cast(chanfrein9.Shape()), mode=Mode.REPLACE)  # a hair under: the kernel refuses the full size

    # Chanfrein10: read off the stored shape, not the designer's step
    # Chanfrein10 outline → Chanfrein10 (cut)
    with BuildSketch(Plane(origin=(0, 0, 0), x_dir=(1, 0, 0), z_dir=(0, 0.31622776601683705, -0.9486832980505141)).offset(CHANFREIN10_START)):
        with Locations((0, 6.008327554)):
            Rectangle(CHANFREIN10_OUTLINE_W, CHANFREIN10_OUTLINE_H)
    extrude(amount=CHANFREIN10_DEPTH, mode=Mode.SUBTRACT)

    # Congé9
    cong_9_edges = [part.edges().sort_by_distance(p)[0] for p in [
        (-37.575, 44.4, 45),
        (-37.575, 6.4, 40),
        (-37.575, 6.4, -27),
        (-37.575, 42.4, 40),
        (-37.575, 42.4, -27),
        (37.575, 6.4, 40),
        (37.575, 44.4, 45),
        (37.575, 6.4, -27),
        (37.575, 42.4, 40),
        (37.575, 42.4, -27),
    ]]
    fillet(cong_9_edges, radius=CONG_9_R)

    # Chanfrein13: read off the stored shape, not the designer's step
    # Chanfrein13 outline → Chanfrein13 (add)
    with BuildSketch(Plane.XY.offset(CHANFREIN13_START)):
        Polygon((-30.15, 30.9), (0.675, 41.175), (0, 41.4), (-30.15, 41.4), align=None)
    extrude(amount=CHANFREIN13_DEPTH)

    # Congé10
    cong_10_edges = [part.edges().sort_by_distance(p)[0] for p in [
        (0, 95.4, -27.2),
    ]]
    fillet(cong_10_edges, radius=CONG_10_R)

    # Esquisse37 → Enlèv. mat.-Extru.8 (cut)
    with BuildSketch(Plane.XZ):
        with Locations(Location((-25.45, 6, 0), (0, 0, 270))):
            Circle(ESQUISSE37_R)
        with Locations(Location((25.45, 6, 0), (0, 0, 270))):
            Circle(ESQUISSE37_R)
    extrude(amount=-ENL_V_MAT_EXTRU_8_DEPTH, mode=Mode.SUBTRACT)

    # Esquisse38 → Boss.-Extru.15 (add)
    with BuildSketch(Plane.XY.offset(-27.2)):
        Polygon((0.675, 41.175), (-21.95, 33.64), (23.28, 33.64), align=None)
    extrude(amount=-BOSS_EXTRU_15_DEPTH)

    # Congé11
    cong_11_edges = [part.edges().sort_by_distance(p)[0] for p in [
        (7.5, 56.9, -36.1),
        (-7.5, 56.9, -36.1),
        (-25, 91.4, -36.1),
        (-7.5, 81.4, -36.1),
        (25, 91.4, -36.1),
        (7.5, 81.4, -36.1),
        (30.15, 31.35, -38.75),
        (-30.15, 30.9, -38.75),
        (0.675, 41.175, -38.75),
    ]]
    fillet(cong_11_edges, radius=CONG_11_R)


solid = part.part
